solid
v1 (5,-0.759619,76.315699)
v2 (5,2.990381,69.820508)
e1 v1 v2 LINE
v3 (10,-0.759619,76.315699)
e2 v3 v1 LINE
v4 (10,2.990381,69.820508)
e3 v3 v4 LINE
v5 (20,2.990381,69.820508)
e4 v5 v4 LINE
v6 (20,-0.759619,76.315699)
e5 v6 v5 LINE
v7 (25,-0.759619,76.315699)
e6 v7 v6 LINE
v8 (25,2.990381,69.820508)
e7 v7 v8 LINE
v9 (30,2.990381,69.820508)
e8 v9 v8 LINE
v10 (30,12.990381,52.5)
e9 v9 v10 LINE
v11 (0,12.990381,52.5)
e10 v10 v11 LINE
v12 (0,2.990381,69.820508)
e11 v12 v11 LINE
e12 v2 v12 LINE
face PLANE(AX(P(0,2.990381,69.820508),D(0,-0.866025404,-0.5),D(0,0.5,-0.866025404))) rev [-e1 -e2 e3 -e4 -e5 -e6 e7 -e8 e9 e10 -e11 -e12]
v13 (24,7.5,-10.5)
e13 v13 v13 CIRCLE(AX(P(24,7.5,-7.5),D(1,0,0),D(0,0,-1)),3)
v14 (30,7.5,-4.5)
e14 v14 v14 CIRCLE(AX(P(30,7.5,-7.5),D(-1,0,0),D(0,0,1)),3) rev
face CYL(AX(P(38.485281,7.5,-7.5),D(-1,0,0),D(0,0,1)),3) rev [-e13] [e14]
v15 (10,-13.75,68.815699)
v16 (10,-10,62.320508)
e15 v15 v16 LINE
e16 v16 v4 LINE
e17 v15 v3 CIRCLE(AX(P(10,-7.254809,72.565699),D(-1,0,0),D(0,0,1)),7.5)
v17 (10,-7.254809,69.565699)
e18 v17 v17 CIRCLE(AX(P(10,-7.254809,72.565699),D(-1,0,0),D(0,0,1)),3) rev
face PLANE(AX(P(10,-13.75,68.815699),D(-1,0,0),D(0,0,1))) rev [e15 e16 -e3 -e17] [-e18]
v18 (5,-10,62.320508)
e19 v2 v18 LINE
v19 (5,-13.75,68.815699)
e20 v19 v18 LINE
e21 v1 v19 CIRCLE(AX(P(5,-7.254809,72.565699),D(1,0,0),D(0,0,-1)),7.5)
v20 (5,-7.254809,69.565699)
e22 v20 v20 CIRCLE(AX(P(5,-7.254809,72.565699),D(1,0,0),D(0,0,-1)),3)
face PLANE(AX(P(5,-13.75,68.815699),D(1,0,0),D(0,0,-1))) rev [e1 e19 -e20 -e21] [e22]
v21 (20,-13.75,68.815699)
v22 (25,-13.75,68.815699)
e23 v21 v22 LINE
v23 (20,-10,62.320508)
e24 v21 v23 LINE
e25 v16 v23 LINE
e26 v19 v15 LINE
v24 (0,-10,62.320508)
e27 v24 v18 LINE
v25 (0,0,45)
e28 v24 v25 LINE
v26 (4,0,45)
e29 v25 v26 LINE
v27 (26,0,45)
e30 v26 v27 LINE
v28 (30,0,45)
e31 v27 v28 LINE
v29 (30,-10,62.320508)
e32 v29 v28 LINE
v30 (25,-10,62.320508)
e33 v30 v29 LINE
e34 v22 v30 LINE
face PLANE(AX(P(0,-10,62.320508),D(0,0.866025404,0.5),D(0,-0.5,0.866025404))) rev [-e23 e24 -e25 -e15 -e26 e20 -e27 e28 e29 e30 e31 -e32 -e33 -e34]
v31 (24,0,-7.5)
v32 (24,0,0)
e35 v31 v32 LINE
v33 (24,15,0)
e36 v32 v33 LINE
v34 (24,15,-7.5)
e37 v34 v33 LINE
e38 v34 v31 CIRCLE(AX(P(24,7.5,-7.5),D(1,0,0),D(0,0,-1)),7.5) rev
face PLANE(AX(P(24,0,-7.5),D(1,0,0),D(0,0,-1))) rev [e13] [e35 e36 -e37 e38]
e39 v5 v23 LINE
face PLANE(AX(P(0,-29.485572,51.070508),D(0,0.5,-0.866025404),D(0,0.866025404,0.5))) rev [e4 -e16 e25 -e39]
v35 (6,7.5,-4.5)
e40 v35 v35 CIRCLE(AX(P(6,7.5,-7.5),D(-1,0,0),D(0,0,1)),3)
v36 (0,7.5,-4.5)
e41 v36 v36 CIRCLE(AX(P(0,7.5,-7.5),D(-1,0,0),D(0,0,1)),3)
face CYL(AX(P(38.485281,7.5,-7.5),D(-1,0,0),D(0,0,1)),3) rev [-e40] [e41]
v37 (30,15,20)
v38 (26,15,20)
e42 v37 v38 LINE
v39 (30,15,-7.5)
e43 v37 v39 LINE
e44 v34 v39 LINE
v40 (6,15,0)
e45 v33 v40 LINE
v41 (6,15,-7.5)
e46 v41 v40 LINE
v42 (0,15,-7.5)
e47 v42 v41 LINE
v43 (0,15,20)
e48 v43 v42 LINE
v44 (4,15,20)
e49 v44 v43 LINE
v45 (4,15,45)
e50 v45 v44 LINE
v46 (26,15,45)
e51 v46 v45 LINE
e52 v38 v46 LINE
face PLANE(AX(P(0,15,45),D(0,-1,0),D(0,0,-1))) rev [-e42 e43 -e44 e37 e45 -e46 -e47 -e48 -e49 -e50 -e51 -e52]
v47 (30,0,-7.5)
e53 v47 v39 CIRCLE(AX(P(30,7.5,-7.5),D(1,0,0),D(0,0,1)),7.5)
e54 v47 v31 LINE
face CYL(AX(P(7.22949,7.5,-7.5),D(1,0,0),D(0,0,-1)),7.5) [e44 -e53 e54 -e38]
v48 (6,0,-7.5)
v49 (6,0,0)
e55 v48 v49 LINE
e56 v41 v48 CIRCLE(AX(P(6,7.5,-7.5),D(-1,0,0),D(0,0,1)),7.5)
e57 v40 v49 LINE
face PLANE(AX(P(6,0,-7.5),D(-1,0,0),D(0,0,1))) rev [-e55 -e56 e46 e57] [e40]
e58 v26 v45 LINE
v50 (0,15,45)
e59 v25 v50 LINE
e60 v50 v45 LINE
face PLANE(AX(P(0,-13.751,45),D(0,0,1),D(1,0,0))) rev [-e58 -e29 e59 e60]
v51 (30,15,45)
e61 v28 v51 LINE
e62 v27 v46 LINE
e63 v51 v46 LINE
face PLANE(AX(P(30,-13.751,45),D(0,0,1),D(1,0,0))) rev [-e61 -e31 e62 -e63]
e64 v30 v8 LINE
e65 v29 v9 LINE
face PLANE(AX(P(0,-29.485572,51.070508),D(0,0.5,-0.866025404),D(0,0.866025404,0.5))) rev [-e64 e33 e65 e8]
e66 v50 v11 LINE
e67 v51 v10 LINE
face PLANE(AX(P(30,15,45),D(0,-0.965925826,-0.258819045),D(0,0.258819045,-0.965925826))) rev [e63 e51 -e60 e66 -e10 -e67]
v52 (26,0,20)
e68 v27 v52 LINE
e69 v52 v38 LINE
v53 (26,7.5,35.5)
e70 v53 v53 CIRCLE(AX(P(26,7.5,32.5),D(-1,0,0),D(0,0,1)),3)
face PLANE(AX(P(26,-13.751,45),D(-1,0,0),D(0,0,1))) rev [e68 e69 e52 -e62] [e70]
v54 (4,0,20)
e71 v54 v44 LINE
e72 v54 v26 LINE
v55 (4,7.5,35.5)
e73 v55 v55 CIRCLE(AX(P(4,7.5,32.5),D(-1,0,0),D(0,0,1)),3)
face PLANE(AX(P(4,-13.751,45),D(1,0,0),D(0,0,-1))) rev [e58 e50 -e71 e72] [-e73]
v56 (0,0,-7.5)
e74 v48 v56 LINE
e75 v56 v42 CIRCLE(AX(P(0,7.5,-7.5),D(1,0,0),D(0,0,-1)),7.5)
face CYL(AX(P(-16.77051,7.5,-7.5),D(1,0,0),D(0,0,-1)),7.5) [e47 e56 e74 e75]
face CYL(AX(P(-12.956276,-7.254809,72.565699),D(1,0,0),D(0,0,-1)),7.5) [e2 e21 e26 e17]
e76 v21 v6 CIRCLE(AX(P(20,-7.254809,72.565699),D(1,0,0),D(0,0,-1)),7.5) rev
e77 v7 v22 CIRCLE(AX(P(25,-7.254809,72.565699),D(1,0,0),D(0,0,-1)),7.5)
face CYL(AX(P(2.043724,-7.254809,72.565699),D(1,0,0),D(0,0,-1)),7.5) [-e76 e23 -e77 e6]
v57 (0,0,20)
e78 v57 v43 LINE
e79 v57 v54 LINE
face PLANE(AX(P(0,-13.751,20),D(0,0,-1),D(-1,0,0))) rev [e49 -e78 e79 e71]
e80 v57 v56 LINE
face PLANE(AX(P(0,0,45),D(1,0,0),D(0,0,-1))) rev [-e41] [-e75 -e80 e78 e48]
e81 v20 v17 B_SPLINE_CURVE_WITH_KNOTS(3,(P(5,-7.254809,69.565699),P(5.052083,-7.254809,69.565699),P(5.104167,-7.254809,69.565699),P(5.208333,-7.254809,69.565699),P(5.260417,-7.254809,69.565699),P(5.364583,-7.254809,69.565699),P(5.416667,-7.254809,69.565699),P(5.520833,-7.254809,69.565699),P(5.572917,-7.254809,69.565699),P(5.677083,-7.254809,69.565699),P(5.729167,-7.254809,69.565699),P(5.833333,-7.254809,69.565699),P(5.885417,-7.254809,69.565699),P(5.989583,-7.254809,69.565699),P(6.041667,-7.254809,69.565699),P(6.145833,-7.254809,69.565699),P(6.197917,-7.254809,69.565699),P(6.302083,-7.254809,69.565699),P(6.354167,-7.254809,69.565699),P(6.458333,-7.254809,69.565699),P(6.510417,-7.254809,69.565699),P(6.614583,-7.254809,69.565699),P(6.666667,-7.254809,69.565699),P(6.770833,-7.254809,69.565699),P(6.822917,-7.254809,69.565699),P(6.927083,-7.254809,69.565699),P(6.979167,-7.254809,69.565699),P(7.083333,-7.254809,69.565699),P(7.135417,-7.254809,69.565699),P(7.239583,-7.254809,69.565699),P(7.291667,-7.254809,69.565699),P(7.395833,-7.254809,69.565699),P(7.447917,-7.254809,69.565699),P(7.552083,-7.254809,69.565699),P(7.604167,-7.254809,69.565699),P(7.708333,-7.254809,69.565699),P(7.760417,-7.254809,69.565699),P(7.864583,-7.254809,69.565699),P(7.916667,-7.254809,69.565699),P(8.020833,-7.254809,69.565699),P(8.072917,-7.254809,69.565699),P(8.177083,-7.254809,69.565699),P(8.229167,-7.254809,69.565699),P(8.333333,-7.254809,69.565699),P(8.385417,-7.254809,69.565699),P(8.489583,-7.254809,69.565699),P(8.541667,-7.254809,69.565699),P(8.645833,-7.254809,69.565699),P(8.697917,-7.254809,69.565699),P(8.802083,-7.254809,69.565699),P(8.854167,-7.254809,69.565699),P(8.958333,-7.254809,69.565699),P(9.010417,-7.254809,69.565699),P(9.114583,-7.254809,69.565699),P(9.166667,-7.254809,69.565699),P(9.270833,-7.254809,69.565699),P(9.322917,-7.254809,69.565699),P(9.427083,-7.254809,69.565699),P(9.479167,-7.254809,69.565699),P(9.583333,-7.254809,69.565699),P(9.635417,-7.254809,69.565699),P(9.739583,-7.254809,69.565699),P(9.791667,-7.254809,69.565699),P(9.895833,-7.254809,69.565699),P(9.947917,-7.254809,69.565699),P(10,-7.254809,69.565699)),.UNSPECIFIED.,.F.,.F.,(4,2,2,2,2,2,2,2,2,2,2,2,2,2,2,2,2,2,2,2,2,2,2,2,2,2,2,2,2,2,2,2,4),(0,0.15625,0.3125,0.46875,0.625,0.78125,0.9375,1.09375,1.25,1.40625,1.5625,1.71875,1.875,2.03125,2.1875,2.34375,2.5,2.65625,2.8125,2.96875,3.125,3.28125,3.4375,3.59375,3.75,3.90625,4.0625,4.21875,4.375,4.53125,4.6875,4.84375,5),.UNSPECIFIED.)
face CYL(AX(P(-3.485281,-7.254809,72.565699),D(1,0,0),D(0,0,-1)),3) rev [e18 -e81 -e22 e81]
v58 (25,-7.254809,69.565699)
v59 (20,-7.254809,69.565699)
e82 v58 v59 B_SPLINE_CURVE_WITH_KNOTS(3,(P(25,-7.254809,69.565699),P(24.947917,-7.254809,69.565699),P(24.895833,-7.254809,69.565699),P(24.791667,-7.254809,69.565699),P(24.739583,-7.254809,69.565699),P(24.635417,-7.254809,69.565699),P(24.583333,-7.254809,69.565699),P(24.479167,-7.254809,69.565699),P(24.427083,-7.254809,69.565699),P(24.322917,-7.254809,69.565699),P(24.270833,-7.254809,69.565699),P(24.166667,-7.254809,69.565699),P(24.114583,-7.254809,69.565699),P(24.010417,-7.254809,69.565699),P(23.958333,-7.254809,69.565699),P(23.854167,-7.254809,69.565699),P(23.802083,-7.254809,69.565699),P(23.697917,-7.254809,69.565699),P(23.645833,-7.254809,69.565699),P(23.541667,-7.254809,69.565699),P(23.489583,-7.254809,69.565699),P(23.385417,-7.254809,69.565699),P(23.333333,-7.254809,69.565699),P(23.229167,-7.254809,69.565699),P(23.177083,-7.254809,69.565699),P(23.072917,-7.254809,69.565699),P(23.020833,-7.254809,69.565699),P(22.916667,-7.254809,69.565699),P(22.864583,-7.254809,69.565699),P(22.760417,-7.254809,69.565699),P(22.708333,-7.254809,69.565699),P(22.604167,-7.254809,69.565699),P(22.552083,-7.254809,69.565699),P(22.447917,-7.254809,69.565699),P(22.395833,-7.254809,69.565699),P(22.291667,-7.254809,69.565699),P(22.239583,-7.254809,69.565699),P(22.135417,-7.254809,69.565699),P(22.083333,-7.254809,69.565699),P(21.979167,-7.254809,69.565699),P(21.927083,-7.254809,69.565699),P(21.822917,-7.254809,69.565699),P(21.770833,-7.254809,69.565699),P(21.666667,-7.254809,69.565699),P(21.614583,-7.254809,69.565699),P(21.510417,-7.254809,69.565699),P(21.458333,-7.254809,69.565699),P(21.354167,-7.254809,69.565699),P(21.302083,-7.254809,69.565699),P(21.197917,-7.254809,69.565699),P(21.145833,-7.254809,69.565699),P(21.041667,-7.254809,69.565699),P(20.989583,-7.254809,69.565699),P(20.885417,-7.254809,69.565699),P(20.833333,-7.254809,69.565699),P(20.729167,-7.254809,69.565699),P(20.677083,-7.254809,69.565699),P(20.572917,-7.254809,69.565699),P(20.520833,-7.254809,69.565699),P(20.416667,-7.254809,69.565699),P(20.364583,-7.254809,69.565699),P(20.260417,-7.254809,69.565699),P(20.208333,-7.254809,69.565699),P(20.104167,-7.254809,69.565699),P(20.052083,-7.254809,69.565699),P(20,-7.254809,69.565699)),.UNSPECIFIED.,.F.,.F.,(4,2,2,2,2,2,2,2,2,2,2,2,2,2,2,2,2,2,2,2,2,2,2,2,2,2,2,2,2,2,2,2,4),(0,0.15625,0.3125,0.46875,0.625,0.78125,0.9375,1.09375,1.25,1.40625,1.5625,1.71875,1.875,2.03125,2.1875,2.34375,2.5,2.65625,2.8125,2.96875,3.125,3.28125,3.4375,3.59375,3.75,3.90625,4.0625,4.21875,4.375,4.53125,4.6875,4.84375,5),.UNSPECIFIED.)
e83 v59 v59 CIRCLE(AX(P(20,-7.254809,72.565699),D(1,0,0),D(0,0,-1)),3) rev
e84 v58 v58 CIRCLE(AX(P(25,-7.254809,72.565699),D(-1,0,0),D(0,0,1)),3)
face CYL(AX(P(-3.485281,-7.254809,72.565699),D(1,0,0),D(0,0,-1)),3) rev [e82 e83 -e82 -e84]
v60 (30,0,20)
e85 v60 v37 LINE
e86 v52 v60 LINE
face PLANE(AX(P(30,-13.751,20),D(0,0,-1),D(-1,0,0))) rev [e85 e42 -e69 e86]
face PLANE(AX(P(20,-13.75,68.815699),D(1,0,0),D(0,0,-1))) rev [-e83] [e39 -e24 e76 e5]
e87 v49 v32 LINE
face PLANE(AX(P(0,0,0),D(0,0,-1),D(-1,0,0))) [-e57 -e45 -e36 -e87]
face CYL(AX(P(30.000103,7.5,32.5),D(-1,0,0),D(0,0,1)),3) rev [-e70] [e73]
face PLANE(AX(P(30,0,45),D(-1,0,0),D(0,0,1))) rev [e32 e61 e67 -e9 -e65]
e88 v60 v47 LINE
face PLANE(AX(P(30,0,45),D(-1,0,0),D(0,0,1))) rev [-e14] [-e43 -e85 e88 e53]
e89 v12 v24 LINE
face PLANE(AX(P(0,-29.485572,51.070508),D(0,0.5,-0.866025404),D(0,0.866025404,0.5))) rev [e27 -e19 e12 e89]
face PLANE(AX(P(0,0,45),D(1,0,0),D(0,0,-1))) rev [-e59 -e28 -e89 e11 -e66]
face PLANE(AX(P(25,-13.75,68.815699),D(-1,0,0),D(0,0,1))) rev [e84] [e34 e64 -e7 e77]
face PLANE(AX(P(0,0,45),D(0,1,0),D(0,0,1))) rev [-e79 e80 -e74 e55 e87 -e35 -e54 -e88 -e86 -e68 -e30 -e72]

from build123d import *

# Parameters (mm, degrees)
SKETCH1_W            = 30
SKETCH1_H            = 15
BOSS_EXTRUDE1_DEPTH  = 45
SKETCH2_W            = 6
SKETCH2_H            = 15
BOSS_EXTRUDE2_DEPTH  = 7.5
BOSS_EXTRUDE3_DEPTH  = 6
BOSS_EXTRUDE4_START  = -24
BOSS_EXTRUDE4_DEPTH  = 6
SKETCH4_R            = 3
CUT_EXTRUDE1_DEPTH   = 30
SKETCH18_W           = 30
SKETCH18_H           = 15
BOSS_EXTRUDE10_DEPTH = 20
BOSS_EXTRUDE11_DEPTH = 30
SKETCH19_W           = 5
SKETCH19_H           = 15
BOSS_EXTRUDE12_DEPTH = 7.5
CUT_EXTRUDE7_REACH   = 88.894
SKETCH22_W           = 4
SKETCH22_H           = 25
SKETCH23_R           = 3
CUT_EXTRUDE8_DEPTH   = 83.00662079
BOSS_EXTRUDE15_DEPTH = 5
BOSS_EXTRUDE16_START = -15
BOSS_EXTRUDE16_DEPTH = 5
SKETCH25_R           = 3
CUT_EXTRUDE10_DEPTH  = 20


with BuildPart() as part:
    # Sketch1 → Boss-Extrude1 (new body)
    with BuildSketch(Plane.XY):
        with Locations((15, 7.5)):
            Rectangle(SKETCH1_W, SKETCH1_H)
    extrude(amount=BOSS_EXTRUDE1_DEPTH)

    # Sketch2 → Boss-Extrude2 (add)
    with BuildSketch(Plane(origin=(0, 0, 0), x_dir=(-1, 0, 0), z_dir=(0, 0, -1))):
        with Locations((-27, 7.5)):
            Rectangle(SKETCH2_W, SKETCH2_H)
        with Locations((-3, 7.5)):
            Rectangle(SKETCH2_W, SKETCH2_H)
    extrude(amount=BOSS_EXTRUDE2_DEPTH)

    # Sketch3 → Boss-Extrude3 (add)
    with BuildSketch(Plane(origin=(30, 0, 0), x_dir=(0, 0, -1), z_dir=(1, 0, 0))):
        with BuildLine():
            Line((7.5, 15), (7.5, 0))
            ThreePointArc((7.5, 0), (15, 7.5), (7.5, 15))
        make_face()
    extrude(amount=-BOSS_EXTRUDE3_DEPTH)

    # Sketch3<2> → Boss-Extrude4 (add)
    with BuildSketch(Plane(origin=(30, 0, 0), x_dir=(0, 0, -1), z_dir=(1, 0, 0)).offset(BOSS_EXTRUDE4_START)):
        with BuildLine():
            Line((7.5, 15), (7.5, 0))
            ThreePointArc((7.5, 0), (15, 7.5), (7.5, 15))
        make_face()
    extrude(amount=-BOSS_EXTRUDE4_DEPTH)

    # Sketch4 → Cut-Extrude1 (cut)
    with BuildSketch(Plane.ZY):
        with Locations((-7.5, 7.5)):
            Circle(SKETCH4_R)
    extrude(amount=-CUT_EXTRUDE1_DEPTH, mode=Mode.SUBTRACT)



with BuildPart() as body_2:
    # Sketch18 → Boss-Extrude10 (new body)
    with BuildSketch(Plane(origin=(0, -19.485571585, 33.75), x_dir=(1, 0, 0), z_dir=(0, -0.500000000000001, 0.866025403784438))):
        with Locations((15, 30)):
            Rectangle(SKETCH18_W, SKETCH18_H)
    extrude(amount=BOSS_EXTRUDE10_DEPTH)


with BuildPart() as part_1:
    add(part.part)

    add(body_2.part)  # Boss-Extrude11 merges body 2
    # 3DSketch1 → Boss-Extrude11 (add)
    with BuildSketch(Plane(origin=(30, 0, 45), x_dir=(0, 1, 0), z_dir=(1, 0, 0))):
        Polygon((0, 0), (15, 0), (12.990381057, 7.5), align=None)
    extrude(amount=-BOSS_EXTRUDE11_DEPTH)

    # Sketch19 → Boss-Extrude12 (add)
    with BuildSketch(Plane(origin=(0, -29.485571585, 51.070508076), x_dir=(1, 0, 0), z_dir=(0, -0.5000000000000009, 0.8660254037844383))):
        with Locations((7.5, 30)):
            Rectangle(SKETCH19_W, SKETCH19_H)
        with Locations((22.5, 30)):
            Rectangle(SKETCH19_W, SKETCH19_H)
    extrude(amount=BOSS_EXTRUDE12_DEPTH)

    # Sketch22 → Cut-Extrude7 (cut, up to next)
    with BuildSketch(Plane(origin=(0, 15, 0), x_dir=(1, 0, 0), z_dir=(0, 1, 0)), mode=Mode.PRIVATE) as cut_extrude7_sk1:
        with Locations((2, -32.5)):
            Rectangle(SKETCH22_W, SKETCH22_H)
    cut_extrude7_tool1 = extrude(cut_extrude7_sk1.sketch, amount=-CUT_EXTRUDE7_REACH, mode=Mode.PRIVATE) & part_1.part
    # Sketch22 → Cut-Extrude7 (cut, up to next)
    with BuildSketch(Plane(origin=(0, 15, 0), x_dir=(1, 0, 0), z_dir=(0, 1, 0)), mode=Mode.PRIVATE) as cut_extrude7_sk2:
        with Locations((28, -32.5)):
            Rectangle(SKETCH22_W, SKETCH22_H)
    cut_extrude7_tool2 = extrude(cut_extrude7_sk2.sketch, amount=-CUT_EXTRUDE7_REACH, mode=Mode.PRIVATE) & part_1.part
    add(cut_extrude7_tool1.solids().sort_by_distance((2, 15, 32.5))[0], mode=Mode.SUBTRACT)
    add(cut_extrude7_tool2.solids().sort_by_distance((28, 15, 32.5))[0], mode=Mode.SUBTRACT)

    # Sketch23 → Cut-Extrude8 (cut, through all)
    with BuildSketch(Plane.ZY.offset(-4)):
        with Locations((32.5, 7.5)):
            Circle(SKETCH23_R)
    extrude(amount=-CUT_EXTRUDE8_DEPTH, mode=Mode.SUBTRACT)

    # Sketch24 → Boss-Extrude15 (add)
    with BuildSketch(Plane(origin=(25, 0, 0), x_dir=(0, 0, -1), z_dir=(1, 0, 0))):
        with BuildLine():
            Line((-76.315698604, -0.759618943), (-68.815698604, -13.75))
            ThreePointArc((-68.815698604, -13.75), (-79.060889132, -11.004809472), (-76.315698604, -0.759618943))
        make_face()
    extrude(amount=-BOSS_EXTRUDE15_DEPTH)

    # Sketch24<2> → Boss-Extrude16 (add)
    with BuildSketch(Plane(origin=(25, 0, 0), x_dir=(0, 0, -1), z_dir=(1, 0, 0)).offset(BOSS_EXTRUDE16_START)):
        with BuildLine():
            Line((-76.315698604, -0.759618943), (-68.815698604, -13.75))
            ThreePointArc((-68.815698604, -13.75), (-79.060889132, -11.004809472), (-76.315698604, -0.759618943))
        make_face()
    extrude(amount=-BOSS_EXTRUDE16_DEPTH)

    # Sketch25 → Cut-Extrude10 (cut)
    with BuildSketch(Plane(origin=(25, 0, 0), x_dir=(0, 0, -1), z_dir=(1, 0, 0))):
        with Locations((-72.565698604, -7.254809472)):
            Circle(SKETCH25_R)
    extrude(amount=-CUT_EXTRUDE10_DEPTH, mode=Mode.SUBTRACT)


solid = part_1.part
